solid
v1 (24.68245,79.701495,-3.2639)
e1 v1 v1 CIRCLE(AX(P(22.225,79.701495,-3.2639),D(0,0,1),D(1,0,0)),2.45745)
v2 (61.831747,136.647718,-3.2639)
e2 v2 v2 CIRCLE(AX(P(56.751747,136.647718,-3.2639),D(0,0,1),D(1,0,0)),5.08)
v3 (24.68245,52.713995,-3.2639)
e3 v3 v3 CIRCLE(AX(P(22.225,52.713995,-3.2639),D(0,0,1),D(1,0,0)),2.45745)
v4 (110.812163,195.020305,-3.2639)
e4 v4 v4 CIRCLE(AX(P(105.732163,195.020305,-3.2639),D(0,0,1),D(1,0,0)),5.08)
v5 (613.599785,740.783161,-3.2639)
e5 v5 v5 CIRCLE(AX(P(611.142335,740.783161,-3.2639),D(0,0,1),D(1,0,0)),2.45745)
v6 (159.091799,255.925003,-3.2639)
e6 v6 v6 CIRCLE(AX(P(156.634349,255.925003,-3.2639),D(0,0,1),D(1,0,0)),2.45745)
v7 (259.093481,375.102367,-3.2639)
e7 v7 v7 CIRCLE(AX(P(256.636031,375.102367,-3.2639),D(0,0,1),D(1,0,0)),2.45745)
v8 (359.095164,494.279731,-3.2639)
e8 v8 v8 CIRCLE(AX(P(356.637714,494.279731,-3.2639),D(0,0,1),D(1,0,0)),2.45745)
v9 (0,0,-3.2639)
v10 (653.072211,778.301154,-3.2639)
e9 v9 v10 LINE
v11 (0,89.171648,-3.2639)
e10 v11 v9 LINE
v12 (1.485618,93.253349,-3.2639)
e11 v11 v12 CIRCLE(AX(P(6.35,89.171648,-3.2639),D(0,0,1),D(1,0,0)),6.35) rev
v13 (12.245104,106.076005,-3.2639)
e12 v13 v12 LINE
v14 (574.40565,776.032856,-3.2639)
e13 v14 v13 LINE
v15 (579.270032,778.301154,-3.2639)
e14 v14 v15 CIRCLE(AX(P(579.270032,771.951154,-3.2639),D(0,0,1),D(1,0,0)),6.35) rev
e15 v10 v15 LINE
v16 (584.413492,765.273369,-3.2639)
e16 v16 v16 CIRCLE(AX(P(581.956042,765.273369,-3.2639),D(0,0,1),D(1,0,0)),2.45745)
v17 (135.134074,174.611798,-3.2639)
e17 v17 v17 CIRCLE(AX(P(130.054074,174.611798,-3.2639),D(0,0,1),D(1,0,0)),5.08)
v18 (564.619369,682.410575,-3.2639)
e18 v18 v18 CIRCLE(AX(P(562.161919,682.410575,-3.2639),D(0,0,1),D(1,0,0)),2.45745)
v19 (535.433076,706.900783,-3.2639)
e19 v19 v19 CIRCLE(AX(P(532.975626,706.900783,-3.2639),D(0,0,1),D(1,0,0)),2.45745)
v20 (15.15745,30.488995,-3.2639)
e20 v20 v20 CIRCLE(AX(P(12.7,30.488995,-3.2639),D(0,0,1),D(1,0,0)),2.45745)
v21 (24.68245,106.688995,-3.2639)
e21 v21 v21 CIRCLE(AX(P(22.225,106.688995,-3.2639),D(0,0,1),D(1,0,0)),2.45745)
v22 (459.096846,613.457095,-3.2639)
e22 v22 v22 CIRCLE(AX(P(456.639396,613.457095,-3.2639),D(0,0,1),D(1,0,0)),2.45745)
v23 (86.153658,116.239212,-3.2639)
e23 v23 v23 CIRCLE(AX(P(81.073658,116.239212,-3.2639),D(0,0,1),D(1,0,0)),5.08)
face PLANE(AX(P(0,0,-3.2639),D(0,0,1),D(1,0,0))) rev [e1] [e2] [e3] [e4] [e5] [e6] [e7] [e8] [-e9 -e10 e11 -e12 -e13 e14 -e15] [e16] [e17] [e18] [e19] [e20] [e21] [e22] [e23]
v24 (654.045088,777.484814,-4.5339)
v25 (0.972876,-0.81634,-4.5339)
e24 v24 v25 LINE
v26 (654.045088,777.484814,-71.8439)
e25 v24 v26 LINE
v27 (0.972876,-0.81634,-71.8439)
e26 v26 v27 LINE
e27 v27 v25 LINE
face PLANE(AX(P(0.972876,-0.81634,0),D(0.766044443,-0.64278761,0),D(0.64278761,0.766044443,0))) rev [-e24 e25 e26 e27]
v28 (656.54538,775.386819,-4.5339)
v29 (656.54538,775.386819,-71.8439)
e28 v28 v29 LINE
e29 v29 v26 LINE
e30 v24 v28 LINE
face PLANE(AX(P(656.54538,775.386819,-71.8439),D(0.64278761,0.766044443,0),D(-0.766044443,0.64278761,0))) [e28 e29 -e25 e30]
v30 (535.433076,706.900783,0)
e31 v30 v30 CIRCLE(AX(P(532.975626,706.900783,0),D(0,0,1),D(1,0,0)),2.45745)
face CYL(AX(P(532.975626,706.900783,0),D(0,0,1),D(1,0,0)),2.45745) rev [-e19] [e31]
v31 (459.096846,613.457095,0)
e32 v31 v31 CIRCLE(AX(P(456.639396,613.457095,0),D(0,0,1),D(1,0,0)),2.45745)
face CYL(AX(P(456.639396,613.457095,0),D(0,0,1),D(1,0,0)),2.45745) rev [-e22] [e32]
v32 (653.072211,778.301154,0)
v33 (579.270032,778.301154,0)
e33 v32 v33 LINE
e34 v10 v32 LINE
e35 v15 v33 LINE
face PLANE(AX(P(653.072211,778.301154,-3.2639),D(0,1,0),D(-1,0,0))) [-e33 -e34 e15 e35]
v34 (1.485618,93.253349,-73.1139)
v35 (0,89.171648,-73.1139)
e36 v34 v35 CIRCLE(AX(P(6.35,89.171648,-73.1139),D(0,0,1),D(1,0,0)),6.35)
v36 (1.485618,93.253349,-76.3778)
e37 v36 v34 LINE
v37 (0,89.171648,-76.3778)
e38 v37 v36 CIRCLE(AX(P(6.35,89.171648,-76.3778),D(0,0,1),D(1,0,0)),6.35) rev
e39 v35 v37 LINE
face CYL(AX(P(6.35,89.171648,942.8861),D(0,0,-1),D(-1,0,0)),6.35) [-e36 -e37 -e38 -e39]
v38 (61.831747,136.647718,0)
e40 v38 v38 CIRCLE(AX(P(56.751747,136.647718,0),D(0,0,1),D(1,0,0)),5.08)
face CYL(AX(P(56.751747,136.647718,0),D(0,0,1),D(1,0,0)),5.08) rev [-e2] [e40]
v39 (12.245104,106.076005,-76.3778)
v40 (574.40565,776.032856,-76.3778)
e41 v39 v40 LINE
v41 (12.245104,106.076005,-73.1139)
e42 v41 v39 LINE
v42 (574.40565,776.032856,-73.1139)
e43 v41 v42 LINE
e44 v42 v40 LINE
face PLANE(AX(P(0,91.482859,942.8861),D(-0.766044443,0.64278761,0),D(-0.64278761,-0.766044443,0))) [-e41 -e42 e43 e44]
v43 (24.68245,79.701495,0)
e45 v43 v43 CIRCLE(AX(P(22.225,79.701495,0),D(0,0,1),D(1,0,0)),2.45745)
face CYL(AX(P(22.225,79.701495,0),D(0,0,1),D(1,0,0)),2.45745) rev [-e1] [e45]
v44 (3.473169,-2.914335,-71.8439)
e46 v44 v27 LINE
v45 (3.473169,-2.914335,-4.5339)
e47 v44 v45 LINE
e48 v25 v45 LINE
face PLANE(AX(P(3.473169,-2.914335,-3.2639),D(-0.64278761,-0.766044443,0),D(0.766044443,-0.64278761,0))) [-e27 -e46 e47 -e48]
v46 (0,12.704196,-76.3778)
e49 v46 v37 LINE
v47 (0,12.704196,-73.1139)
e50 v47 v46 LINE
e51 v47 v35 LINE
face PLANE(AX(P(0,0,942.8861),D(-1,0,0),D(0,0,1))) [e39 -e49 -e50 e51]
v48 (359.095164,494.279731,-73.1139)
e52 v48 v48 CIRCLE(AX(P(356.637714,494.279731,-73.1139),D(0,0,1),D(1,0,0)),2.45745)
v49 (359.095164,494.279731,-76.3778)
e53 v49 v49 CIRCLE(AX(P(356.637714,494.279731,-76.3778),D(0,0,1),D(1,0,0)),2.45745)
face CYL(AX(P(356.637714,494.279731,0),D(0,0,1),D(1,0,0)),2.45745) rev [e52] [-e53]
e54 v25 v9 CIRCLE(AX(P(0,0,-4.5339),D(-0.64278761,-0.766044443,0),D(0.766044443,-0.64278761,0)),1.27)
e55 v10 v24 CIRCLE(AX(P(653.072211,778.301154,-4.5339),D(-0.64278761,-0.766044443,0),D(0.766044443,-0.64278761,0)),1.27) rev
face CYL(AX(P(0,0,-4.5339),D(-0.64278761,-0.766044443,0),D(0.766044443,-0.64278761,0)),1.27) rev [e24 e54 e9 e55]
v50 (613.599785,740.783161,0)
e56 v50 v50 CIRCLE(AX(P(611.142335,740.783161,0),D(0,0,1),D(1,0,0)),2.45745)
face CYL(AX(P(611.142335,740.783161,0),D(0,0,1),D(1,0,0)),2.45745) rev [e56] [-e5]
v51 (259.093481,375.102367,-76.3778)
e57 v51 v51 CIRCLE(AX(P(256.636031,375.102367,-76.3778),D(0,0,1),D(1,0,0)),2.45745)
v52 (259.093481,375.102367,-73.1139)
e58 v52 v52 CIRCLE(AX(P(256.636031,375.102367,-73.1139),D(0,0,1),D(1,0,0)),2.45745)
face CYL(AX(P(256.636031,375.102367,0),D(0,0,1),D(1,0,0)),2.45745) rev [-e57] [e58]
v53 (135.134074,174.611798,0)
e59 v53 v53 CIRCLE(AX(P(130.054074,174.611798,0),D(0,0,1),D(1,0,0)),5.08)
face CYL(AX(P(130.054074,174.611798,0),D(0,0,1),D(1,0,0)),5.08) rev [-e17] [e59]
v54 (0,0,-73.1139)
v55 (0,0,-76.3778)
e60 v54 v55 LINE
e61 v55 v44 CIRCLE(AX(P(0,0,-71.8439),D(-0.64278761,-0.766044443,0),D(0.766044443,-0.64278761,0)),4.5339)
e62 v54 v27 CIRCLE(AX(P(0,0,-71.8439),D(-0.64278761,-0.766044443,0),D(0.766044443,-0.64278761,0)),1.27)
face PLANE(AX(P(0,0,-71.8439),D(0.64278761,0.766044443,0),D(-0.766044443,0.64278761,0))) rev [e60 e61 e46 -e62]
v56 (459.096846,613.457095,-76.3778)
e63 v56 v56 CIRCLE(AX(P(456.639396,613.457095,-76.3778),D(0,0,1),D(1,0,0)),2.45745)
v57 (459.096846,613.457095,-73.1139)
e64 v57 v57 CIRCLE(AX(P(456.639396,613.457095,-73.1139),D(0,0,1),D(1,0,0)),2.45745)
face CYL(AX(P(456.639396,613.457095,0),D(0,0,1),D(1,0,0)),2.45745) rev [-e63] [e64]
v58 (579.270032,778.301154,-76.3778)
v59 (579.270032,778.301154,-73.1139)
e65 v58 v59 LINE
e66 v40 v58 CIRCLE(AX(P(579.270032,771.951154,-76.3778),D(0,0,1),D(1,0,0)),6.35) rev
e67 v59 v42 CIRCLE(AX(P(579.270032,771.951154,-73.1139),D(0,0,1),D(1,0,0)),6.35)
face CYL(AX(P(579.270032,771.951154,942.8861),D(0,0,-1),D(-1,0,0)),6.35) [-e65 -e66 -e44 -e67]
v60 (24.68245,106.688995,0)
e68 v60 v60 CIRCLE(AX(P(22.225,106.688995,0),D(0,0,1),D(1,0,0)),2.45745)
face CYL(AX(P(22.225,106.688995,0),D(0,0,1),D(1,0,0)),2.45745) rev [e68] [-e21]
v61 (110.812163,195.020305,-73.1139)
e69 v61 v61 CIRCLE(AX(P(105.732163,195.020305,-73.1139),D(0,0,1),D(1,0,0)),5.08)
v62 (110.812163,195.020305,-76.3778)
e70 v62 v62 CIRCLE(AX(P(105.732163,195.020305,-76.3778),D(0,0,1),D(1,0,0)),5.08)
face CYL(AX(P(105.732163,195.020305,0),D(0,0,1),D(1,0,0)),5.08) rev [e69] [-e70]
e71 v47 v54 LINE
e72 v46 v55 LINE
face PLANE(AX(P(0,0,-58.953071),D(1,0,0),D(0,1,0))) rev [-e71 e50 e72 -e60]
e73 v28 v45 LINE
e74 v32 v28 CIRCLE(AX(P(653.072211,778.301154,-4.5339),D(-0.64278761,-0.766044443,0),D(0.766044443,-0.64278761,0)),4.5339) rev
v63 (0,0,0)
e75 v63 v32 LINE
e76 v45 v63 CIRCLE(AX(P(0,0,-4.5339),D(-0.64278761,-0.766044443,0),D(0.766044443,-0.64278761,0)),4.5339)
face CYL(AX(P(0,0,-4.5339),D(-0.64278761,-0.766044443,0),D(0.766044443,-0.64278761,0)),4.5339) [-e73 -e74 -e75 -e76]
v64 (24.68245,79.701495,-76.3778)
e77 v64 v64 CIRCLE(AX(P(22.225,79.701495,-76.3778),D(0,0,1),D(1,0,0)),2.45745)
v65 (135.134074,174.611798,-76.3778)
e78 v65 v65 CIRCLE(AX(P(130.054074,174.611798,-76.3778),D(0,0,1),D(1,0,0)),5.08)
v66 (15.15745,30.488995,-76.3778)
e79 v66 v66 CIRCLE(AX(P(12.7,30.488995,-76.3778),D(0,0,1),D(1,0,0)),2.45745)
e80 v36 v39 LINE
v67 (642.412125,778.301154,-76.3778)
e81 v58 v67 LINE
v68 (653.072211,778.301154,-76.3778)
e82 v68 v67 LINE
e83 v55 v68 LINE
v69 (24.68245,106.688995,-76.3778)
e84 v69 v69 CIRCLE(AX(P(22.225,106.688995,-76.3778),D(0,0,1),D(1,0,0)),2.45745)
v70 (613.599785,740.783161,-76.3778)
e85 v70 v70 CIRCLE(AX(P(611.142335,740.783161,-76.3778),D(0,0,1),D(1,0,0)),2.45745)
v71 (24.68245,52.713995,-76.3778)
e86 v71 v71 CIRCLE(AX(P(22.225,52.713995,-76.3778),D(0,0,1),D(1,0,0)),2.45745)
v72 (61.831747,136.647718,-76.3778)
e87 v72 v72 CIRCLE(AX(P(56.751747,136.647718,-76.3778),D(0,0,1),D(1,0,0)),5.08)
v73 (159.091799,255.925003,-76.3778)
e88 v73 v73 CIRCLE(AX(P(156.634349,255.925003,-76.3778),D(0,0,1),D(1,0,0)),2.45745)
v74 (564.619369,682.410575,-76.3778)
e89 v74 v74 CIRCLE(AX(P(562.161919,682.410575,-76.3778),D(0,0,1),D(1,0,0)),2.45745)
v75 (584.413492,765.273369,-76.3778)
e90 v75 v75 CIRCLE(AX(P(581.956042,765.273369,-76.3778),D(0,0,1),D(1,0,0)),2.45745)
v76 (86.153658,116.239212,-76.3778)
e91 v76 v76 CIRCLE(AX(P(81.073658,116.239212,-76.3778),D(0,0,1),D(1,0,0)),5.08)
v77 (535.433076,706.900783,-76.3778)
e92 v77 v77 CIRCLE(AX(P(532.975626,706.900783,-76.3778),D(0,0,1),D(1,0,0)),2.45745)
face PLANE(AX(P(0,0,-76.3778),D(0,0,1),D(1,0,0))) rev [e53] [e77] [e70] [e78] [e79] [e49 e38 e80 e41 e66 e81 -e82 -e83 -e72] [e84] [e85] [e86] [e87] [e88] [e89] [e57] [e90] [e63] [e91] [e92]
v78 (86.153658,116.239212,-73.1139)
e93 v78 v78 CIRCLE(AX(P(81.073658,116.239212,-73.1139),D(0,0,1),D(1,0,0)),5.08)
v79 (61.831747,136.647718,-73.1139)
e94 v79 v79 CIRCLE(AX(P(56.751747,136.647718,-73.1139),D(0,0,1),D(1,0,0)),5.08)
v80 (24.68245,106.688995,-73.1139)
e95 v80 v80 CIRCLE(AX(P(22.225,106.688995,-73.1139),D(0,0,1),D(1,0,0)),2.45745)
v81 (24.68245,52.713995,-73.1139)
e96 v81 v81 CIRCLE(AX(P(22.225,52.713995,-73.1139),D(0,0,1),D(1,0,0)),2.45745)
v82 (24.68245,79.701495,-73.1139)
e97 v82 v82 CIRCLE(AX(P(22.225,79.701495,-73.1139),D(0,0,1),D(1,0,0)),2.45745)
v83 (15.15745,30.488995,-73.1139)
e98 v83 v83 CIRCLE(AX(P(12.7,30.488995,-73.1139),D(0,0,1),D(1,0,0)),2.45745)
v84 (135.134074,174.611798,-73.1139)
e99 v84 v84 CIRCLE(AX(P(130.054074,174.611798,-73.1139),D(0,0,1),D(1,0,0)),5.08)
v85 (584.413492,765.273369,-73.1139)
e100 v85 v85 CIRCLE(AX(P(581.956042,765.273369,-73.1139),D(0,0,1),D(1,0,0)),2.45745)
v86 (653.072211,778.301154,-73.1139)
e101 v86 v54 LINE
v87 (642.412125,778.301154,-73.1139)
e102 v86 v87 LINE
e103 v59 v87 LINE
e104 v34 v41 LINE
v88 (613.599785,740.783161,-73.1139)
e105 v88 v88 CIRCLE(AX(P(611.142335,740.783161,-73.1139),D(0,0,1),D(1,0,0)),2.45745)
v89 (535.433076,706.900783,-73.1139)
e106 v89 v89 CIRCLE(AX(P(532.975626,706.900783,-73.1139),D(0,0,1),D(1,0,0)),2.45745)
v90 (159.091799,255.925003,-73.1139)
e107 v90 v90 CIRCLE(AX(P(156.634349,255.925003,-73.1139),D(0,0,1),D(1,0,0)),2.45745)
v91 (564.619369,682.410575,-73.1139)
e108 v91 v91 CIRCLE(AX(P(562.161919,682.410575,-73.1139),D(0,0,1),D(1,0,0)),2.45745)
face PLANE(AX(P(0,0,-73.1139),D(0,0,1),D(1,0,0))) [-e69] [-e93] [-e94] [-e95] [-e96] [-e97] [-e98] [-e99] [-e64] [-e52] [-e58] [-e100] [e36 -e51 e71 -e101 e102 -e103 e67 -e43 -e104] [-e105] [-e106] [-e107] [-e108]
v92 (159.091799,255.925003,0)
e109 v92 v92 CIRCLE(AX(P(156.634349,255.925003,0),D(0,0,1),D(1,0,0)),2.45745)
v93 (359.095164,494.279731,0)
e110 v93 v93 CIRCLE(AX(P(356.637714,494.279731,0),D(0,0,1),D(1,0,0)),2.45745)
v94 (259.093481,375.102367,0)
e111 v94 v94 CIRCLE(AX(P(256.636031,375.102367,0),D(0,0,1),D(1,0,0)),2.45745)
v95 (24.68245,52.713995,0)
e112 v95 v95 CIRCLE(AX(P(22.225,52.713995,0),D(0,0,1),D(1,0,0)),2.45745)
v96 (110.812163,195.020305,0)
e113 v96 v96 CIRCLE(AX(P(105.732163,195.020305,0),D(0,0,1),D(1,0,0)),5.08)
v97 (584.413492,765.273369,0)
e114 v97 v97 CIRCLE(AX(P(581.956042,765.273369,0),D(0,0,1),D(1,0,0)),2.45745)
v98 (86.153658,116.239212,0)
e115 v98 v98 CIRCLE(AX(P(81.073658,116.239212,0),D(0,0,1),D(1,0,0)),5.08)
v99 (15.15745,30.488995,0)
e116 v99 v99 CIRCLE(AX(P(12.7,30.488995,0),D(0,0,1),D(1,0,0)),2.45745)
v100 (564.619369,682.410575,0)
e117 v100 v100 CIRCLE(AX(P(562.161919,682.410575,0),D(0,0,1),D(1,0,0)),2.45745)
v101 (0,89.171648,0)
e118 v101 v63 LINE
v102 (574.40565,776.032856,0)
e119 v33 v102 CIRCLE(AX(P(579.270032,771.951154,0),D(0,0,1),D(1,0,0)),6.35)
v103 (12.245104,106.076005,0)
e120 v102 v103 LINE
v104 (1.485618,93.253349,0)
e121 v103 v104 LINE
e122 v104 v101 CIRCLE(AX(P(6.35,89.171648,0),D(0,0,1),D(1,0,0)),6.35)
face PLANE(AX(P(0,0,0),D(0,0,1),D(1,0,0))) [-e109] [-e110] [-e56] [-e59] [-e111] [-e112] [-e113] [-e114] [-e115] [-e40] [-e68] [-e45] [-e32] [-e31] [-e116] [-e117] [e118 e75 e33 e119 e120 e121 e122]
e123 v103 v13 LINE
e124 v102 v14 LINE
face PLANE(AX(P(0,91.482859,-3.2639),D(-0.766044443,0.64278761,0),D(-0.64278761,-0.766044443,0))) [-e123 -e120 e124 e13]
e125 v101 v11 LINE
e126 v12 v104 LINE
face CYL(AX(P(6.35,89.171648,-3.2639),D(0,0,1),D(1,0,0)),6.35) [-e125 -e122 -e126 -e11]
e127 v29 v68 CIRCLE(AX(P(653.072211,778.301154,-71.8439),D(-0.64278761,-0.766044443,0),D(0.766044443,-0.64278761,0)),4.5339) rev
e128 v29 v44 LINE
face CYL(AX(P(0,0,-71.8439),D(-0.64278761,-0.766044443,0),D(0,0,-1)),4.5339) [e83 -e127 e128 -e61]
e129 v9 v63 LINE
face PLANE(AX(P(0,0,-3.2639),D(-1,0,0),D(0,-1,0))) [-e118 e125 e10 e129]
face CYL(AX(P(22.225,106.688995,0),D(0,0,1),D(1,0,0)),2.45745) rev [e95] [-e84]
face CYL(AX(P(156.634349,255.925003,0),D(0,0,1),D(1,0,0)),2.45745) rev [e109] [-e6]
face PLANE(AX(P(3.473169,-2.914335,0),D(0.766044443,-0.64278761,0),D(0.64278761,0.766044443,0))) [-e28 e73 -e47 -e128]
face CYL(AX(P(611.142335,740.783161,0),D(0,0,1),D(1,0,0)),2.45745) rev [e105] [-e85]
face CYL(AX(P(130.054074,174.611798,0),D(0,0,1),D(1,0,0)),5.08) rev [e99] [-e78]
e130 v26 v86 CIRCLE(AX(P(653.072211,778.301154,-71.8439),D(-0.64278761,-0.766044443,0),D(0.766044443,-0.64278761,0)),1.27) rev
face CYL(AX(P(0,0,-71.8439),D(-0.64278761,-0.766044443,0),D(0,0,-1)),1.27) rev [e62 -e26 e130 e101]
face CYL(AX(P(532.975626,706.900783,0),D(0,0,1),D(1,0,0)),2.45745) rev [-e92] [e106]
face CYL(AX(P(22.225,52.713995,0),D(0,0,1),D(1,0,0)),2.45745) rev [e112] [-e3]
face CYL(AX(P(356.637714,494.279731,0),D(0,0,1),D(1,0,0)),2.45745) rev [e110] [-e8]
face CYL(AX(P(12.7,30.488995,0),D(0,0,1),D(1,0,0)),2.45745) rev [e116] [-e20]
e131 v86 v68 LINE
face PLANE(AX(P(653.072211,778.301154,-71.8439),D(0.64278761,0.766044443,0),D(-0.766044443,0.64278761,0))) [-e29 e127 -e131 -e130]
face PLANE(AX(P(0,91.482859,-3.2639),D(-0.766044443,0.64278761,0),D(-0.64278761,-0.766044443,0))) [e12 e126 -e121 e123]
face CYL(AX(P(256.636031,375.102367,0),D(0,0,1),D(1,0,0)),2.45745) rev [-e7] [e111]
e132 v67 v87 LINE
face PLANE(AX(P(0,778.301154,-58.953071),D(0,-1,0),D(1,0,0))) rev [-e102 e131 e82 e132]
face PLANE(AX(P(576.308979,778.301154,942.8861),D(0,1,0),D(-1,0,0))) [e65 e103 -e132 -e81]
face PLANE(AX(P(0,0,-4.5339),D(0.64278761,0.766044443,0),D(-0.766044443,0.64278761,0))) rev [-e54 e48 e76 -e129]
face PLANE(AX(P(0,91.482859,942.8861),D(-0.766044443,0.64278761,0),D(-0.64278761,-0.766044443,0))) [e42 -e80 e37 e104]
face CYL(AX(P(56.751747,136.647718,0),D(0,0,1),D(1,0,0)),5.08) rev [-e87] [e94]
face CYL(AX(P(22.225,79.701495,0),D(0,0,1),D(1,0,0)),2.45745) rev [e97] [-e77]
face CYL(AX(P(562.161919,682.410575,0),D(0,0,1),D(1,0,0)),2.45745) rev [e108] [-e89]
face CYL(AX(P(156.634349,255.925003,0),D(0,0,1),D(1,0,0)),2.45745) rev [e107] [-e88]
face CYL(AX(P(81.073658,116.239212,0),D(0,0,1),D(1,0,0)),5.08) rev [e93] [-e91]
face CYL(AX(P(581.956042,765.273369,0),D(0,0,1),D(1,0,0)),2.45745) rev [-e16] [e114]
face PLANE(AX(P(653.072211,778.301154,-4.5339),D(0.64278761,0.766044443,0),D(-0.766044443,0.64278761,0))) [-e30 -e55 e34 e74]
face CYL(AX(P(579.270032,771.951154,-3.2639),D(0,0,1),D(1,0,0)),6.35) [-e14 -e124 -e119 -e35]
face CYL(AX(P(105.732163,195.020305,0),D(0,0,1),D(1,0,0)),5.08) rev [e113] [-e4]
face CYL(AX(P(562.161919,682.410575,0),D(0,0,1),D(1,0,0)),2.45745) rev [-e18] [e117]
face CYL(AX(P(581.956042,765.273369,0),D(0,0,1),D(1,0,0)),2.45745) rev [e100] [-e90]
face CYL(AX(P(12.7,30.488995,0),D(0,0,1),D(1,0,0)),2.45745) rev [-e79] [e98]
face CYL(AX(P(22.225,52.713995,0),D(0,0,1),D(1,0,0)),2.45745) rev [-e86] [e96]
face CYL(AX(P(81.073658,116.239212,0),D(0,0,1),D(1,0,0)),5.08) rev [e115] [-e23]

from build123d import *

# Parameters (mm, degrees)
BASE_FLANGE1_DEPTH           = 3.2639
EDGE_FLANGE1_DEPTH           = 1016
EDGE_FLANGE2_DEPTH           = 1016
BOSS_EXTRUDE1_DEPTH          = 3.2639
CUT_EXTRUDE1_DEPTH           = 3.2639
F_10_0_1935_DIAMETER_HOLE1_D = 4.9149
LPATTERN1_COUNT              = 4
LPATTERN1_PITCH              = 155.575
F_3_8_0_4_DOWEL_HOLE1_D      = 10.16
F_10_0_1935_DIAMETER_HOLE2_D = 4.9149
F_10_0_1935_DIAMETER_HOLE3_D = 4.9149
FILLET1_R                    = 6.35


# Sheet-metal steps are written as plain solids
with BuildPart() as part:
    # Sketch1 → Base-Flange1 (new body)
    with BuildSketch(Plane.XY):
        Polygon((0, 0), (653.072211442, 778.301154209), (576.30897854, 778.301154209), (0, 91.482858589), align=None)
    extrude(amount=-BASE_FLANGE1_DEPTH)

    # Edge-Flange1 section (across the edge) → Edge-Flange1 (add)
    with BuildSketch(Plane(origin=(654.045087884, 777.484813945, -3.2639), x_dir=(-0.7660444431189772, 0.6427876096865405, -3.4914813388431334e-15), z_dir=(-0.6427876096865405, -0.7660444431189772, 0))):
        with BuildLine():
            Line((-3.2639, 1.27), (-3.2639, 68.58))
            Line((-3.2639, 68.58), (0, 68.58))
            Line((0, 68.58), (0, 1.27))
            ThreePointArc((0, 1.27), (0.371974388, 0.371974388), (1.27, 0))
            Line((1.27, 0), (1.27, -3.2639))
            ThreePointArc((1.27, -3.2639), (-1.935951435, -1.935951435), (-3.2639, 1.27))
        make_face()
    extrude(amount=EDGE_FLANGE1_DEPTH)

    # Edge-Flange2 section (across the edge) → Edge-Flange2 (add)
    with BuildSketch(Plane(origin=(654.045087884, 777.484813945, -73.1139), x_dir=(0, 0, 1), z_dir=(-0.6427876096865404, -0.7660444431189771, 0))):
        with BuildLine():
            Line((-3.2639, 1.27), (-3.2639, 9.4361))
            Line((-3.2639, 9.4361), (0, 9.4361))
            Line((0, 9.4361), (0, 1.27))
            ThreePointArc((0, 1.27), (0.371974388, 0.371974388), (1.27, 0))
            Line((1.27, 0), (1.27, -3.2639))
            ThreePointArc((1.27, -3.2639), (-1.935951435, -1.935951435), (-3.2639, 1.27))
        make_face()
    extrude(amount=EDGE_FLANGE2_DEPTH)

    # Sketch12 → Boss-Extrude1 (add)
    with BuildSketch(Plane(origin=(0, 0, -76.3778), x_dir=(-1, 0, 0), z_dir=(0, 0, -1))):
        Polygon((-576.30897854, 778.301154209), (-653.072211442, 778.301154209), (0, 0), (0, 91.482858589), align=None)
    extrude(amount=-BOSS_EXTRUDE1_DEPTH)

    # Sketch13 → Cut-Extrude1 (cut)
    with BuildSketch(Plane(origin=(0, 0, -76.3778), x_dir=(-1, 0, 0), z_dir=(0, 0, -1))):
        Polygon((-646.816615915, 783.550222108), (-653.072211442, 778.301154209), (-642.412124976, 778.301154209), align=None)
        Polygon((0, 12.704196343), (0, 0), (6.255595527, 5.249067899), align=None)
    extrude(amount=-CUT_EXTRUDE1_DEPTH, mode=Mode.SUBTRACT)

    # #10 (0.1935) Diameter Hole1 (through all)
    with Locations(Plane.XY):
        with Locations((456.639396233, 613.457095394)):
            f_10_0_1935_diameter_hole1 = Hole(F_10_0_1935_DIAMETER_HOLE1_D / 2)

    # LPattern1: #10 (0.1935) Diameter Hole1 ×4
    with Locations(*[Vector(-0.6427876096865404, -0.7660444431189771, 0) * (i * LPATTERN1_PITCH) for i in range(1, LPATTERN1_COUNT)]):
        add(f_10_0_1935_diameter_hole1, mode=Mode.SUBTRACT)

    # 3/8 (0.4) Dowel Hole1 (through all)
    with Locations(Plane.XY):
        with Locations((56.751746801, 136.647718392), (81.073657871, 116.239211785), (130.054073729, 174.611798351), (105.73216266, 195.020304958)):
            Hole(F_3_8_0_4_DOWEL_HOLE1_D / 2)

    # #10 (0.1935) Diameter Hole2 (through all)
    with Locations(Plane.XY):
        with Locations((12.7, 30.488995291), (22.225, 52.713995291), (22.225, 79.701495291), (22.225, 106.688995291)):
            Hole(F_10_0_1935_DIAMETER_HOLE2_D / 2)

    # #10 (0.1935) Diameter Hole3 (through all)
    with Locations(Plane.XY):
        with Locations((581.956041646, 765.273369352), (532.975625788, 706.900782786), (562.161919071, 682.410574857), (611.142334929, 740.783161423)):
            Hole(F_10_0_1935_DIAMETER_HOLE3_D / 2)

    # Fillet1
    fillet1_edges = [part.edges().sort_by_distance(p)[0] for p in [
        (0, 91.482858589, -74.74585),
        (576.30897854, 778.301154209, -74.74585),
        (0, 91.482858589, -1.63195),
        (576.30897854, 778.301154209, -1.63195),
    ]]
    fillet(fillet1_edges, radius=FILLET1_R)


solid = part.part
